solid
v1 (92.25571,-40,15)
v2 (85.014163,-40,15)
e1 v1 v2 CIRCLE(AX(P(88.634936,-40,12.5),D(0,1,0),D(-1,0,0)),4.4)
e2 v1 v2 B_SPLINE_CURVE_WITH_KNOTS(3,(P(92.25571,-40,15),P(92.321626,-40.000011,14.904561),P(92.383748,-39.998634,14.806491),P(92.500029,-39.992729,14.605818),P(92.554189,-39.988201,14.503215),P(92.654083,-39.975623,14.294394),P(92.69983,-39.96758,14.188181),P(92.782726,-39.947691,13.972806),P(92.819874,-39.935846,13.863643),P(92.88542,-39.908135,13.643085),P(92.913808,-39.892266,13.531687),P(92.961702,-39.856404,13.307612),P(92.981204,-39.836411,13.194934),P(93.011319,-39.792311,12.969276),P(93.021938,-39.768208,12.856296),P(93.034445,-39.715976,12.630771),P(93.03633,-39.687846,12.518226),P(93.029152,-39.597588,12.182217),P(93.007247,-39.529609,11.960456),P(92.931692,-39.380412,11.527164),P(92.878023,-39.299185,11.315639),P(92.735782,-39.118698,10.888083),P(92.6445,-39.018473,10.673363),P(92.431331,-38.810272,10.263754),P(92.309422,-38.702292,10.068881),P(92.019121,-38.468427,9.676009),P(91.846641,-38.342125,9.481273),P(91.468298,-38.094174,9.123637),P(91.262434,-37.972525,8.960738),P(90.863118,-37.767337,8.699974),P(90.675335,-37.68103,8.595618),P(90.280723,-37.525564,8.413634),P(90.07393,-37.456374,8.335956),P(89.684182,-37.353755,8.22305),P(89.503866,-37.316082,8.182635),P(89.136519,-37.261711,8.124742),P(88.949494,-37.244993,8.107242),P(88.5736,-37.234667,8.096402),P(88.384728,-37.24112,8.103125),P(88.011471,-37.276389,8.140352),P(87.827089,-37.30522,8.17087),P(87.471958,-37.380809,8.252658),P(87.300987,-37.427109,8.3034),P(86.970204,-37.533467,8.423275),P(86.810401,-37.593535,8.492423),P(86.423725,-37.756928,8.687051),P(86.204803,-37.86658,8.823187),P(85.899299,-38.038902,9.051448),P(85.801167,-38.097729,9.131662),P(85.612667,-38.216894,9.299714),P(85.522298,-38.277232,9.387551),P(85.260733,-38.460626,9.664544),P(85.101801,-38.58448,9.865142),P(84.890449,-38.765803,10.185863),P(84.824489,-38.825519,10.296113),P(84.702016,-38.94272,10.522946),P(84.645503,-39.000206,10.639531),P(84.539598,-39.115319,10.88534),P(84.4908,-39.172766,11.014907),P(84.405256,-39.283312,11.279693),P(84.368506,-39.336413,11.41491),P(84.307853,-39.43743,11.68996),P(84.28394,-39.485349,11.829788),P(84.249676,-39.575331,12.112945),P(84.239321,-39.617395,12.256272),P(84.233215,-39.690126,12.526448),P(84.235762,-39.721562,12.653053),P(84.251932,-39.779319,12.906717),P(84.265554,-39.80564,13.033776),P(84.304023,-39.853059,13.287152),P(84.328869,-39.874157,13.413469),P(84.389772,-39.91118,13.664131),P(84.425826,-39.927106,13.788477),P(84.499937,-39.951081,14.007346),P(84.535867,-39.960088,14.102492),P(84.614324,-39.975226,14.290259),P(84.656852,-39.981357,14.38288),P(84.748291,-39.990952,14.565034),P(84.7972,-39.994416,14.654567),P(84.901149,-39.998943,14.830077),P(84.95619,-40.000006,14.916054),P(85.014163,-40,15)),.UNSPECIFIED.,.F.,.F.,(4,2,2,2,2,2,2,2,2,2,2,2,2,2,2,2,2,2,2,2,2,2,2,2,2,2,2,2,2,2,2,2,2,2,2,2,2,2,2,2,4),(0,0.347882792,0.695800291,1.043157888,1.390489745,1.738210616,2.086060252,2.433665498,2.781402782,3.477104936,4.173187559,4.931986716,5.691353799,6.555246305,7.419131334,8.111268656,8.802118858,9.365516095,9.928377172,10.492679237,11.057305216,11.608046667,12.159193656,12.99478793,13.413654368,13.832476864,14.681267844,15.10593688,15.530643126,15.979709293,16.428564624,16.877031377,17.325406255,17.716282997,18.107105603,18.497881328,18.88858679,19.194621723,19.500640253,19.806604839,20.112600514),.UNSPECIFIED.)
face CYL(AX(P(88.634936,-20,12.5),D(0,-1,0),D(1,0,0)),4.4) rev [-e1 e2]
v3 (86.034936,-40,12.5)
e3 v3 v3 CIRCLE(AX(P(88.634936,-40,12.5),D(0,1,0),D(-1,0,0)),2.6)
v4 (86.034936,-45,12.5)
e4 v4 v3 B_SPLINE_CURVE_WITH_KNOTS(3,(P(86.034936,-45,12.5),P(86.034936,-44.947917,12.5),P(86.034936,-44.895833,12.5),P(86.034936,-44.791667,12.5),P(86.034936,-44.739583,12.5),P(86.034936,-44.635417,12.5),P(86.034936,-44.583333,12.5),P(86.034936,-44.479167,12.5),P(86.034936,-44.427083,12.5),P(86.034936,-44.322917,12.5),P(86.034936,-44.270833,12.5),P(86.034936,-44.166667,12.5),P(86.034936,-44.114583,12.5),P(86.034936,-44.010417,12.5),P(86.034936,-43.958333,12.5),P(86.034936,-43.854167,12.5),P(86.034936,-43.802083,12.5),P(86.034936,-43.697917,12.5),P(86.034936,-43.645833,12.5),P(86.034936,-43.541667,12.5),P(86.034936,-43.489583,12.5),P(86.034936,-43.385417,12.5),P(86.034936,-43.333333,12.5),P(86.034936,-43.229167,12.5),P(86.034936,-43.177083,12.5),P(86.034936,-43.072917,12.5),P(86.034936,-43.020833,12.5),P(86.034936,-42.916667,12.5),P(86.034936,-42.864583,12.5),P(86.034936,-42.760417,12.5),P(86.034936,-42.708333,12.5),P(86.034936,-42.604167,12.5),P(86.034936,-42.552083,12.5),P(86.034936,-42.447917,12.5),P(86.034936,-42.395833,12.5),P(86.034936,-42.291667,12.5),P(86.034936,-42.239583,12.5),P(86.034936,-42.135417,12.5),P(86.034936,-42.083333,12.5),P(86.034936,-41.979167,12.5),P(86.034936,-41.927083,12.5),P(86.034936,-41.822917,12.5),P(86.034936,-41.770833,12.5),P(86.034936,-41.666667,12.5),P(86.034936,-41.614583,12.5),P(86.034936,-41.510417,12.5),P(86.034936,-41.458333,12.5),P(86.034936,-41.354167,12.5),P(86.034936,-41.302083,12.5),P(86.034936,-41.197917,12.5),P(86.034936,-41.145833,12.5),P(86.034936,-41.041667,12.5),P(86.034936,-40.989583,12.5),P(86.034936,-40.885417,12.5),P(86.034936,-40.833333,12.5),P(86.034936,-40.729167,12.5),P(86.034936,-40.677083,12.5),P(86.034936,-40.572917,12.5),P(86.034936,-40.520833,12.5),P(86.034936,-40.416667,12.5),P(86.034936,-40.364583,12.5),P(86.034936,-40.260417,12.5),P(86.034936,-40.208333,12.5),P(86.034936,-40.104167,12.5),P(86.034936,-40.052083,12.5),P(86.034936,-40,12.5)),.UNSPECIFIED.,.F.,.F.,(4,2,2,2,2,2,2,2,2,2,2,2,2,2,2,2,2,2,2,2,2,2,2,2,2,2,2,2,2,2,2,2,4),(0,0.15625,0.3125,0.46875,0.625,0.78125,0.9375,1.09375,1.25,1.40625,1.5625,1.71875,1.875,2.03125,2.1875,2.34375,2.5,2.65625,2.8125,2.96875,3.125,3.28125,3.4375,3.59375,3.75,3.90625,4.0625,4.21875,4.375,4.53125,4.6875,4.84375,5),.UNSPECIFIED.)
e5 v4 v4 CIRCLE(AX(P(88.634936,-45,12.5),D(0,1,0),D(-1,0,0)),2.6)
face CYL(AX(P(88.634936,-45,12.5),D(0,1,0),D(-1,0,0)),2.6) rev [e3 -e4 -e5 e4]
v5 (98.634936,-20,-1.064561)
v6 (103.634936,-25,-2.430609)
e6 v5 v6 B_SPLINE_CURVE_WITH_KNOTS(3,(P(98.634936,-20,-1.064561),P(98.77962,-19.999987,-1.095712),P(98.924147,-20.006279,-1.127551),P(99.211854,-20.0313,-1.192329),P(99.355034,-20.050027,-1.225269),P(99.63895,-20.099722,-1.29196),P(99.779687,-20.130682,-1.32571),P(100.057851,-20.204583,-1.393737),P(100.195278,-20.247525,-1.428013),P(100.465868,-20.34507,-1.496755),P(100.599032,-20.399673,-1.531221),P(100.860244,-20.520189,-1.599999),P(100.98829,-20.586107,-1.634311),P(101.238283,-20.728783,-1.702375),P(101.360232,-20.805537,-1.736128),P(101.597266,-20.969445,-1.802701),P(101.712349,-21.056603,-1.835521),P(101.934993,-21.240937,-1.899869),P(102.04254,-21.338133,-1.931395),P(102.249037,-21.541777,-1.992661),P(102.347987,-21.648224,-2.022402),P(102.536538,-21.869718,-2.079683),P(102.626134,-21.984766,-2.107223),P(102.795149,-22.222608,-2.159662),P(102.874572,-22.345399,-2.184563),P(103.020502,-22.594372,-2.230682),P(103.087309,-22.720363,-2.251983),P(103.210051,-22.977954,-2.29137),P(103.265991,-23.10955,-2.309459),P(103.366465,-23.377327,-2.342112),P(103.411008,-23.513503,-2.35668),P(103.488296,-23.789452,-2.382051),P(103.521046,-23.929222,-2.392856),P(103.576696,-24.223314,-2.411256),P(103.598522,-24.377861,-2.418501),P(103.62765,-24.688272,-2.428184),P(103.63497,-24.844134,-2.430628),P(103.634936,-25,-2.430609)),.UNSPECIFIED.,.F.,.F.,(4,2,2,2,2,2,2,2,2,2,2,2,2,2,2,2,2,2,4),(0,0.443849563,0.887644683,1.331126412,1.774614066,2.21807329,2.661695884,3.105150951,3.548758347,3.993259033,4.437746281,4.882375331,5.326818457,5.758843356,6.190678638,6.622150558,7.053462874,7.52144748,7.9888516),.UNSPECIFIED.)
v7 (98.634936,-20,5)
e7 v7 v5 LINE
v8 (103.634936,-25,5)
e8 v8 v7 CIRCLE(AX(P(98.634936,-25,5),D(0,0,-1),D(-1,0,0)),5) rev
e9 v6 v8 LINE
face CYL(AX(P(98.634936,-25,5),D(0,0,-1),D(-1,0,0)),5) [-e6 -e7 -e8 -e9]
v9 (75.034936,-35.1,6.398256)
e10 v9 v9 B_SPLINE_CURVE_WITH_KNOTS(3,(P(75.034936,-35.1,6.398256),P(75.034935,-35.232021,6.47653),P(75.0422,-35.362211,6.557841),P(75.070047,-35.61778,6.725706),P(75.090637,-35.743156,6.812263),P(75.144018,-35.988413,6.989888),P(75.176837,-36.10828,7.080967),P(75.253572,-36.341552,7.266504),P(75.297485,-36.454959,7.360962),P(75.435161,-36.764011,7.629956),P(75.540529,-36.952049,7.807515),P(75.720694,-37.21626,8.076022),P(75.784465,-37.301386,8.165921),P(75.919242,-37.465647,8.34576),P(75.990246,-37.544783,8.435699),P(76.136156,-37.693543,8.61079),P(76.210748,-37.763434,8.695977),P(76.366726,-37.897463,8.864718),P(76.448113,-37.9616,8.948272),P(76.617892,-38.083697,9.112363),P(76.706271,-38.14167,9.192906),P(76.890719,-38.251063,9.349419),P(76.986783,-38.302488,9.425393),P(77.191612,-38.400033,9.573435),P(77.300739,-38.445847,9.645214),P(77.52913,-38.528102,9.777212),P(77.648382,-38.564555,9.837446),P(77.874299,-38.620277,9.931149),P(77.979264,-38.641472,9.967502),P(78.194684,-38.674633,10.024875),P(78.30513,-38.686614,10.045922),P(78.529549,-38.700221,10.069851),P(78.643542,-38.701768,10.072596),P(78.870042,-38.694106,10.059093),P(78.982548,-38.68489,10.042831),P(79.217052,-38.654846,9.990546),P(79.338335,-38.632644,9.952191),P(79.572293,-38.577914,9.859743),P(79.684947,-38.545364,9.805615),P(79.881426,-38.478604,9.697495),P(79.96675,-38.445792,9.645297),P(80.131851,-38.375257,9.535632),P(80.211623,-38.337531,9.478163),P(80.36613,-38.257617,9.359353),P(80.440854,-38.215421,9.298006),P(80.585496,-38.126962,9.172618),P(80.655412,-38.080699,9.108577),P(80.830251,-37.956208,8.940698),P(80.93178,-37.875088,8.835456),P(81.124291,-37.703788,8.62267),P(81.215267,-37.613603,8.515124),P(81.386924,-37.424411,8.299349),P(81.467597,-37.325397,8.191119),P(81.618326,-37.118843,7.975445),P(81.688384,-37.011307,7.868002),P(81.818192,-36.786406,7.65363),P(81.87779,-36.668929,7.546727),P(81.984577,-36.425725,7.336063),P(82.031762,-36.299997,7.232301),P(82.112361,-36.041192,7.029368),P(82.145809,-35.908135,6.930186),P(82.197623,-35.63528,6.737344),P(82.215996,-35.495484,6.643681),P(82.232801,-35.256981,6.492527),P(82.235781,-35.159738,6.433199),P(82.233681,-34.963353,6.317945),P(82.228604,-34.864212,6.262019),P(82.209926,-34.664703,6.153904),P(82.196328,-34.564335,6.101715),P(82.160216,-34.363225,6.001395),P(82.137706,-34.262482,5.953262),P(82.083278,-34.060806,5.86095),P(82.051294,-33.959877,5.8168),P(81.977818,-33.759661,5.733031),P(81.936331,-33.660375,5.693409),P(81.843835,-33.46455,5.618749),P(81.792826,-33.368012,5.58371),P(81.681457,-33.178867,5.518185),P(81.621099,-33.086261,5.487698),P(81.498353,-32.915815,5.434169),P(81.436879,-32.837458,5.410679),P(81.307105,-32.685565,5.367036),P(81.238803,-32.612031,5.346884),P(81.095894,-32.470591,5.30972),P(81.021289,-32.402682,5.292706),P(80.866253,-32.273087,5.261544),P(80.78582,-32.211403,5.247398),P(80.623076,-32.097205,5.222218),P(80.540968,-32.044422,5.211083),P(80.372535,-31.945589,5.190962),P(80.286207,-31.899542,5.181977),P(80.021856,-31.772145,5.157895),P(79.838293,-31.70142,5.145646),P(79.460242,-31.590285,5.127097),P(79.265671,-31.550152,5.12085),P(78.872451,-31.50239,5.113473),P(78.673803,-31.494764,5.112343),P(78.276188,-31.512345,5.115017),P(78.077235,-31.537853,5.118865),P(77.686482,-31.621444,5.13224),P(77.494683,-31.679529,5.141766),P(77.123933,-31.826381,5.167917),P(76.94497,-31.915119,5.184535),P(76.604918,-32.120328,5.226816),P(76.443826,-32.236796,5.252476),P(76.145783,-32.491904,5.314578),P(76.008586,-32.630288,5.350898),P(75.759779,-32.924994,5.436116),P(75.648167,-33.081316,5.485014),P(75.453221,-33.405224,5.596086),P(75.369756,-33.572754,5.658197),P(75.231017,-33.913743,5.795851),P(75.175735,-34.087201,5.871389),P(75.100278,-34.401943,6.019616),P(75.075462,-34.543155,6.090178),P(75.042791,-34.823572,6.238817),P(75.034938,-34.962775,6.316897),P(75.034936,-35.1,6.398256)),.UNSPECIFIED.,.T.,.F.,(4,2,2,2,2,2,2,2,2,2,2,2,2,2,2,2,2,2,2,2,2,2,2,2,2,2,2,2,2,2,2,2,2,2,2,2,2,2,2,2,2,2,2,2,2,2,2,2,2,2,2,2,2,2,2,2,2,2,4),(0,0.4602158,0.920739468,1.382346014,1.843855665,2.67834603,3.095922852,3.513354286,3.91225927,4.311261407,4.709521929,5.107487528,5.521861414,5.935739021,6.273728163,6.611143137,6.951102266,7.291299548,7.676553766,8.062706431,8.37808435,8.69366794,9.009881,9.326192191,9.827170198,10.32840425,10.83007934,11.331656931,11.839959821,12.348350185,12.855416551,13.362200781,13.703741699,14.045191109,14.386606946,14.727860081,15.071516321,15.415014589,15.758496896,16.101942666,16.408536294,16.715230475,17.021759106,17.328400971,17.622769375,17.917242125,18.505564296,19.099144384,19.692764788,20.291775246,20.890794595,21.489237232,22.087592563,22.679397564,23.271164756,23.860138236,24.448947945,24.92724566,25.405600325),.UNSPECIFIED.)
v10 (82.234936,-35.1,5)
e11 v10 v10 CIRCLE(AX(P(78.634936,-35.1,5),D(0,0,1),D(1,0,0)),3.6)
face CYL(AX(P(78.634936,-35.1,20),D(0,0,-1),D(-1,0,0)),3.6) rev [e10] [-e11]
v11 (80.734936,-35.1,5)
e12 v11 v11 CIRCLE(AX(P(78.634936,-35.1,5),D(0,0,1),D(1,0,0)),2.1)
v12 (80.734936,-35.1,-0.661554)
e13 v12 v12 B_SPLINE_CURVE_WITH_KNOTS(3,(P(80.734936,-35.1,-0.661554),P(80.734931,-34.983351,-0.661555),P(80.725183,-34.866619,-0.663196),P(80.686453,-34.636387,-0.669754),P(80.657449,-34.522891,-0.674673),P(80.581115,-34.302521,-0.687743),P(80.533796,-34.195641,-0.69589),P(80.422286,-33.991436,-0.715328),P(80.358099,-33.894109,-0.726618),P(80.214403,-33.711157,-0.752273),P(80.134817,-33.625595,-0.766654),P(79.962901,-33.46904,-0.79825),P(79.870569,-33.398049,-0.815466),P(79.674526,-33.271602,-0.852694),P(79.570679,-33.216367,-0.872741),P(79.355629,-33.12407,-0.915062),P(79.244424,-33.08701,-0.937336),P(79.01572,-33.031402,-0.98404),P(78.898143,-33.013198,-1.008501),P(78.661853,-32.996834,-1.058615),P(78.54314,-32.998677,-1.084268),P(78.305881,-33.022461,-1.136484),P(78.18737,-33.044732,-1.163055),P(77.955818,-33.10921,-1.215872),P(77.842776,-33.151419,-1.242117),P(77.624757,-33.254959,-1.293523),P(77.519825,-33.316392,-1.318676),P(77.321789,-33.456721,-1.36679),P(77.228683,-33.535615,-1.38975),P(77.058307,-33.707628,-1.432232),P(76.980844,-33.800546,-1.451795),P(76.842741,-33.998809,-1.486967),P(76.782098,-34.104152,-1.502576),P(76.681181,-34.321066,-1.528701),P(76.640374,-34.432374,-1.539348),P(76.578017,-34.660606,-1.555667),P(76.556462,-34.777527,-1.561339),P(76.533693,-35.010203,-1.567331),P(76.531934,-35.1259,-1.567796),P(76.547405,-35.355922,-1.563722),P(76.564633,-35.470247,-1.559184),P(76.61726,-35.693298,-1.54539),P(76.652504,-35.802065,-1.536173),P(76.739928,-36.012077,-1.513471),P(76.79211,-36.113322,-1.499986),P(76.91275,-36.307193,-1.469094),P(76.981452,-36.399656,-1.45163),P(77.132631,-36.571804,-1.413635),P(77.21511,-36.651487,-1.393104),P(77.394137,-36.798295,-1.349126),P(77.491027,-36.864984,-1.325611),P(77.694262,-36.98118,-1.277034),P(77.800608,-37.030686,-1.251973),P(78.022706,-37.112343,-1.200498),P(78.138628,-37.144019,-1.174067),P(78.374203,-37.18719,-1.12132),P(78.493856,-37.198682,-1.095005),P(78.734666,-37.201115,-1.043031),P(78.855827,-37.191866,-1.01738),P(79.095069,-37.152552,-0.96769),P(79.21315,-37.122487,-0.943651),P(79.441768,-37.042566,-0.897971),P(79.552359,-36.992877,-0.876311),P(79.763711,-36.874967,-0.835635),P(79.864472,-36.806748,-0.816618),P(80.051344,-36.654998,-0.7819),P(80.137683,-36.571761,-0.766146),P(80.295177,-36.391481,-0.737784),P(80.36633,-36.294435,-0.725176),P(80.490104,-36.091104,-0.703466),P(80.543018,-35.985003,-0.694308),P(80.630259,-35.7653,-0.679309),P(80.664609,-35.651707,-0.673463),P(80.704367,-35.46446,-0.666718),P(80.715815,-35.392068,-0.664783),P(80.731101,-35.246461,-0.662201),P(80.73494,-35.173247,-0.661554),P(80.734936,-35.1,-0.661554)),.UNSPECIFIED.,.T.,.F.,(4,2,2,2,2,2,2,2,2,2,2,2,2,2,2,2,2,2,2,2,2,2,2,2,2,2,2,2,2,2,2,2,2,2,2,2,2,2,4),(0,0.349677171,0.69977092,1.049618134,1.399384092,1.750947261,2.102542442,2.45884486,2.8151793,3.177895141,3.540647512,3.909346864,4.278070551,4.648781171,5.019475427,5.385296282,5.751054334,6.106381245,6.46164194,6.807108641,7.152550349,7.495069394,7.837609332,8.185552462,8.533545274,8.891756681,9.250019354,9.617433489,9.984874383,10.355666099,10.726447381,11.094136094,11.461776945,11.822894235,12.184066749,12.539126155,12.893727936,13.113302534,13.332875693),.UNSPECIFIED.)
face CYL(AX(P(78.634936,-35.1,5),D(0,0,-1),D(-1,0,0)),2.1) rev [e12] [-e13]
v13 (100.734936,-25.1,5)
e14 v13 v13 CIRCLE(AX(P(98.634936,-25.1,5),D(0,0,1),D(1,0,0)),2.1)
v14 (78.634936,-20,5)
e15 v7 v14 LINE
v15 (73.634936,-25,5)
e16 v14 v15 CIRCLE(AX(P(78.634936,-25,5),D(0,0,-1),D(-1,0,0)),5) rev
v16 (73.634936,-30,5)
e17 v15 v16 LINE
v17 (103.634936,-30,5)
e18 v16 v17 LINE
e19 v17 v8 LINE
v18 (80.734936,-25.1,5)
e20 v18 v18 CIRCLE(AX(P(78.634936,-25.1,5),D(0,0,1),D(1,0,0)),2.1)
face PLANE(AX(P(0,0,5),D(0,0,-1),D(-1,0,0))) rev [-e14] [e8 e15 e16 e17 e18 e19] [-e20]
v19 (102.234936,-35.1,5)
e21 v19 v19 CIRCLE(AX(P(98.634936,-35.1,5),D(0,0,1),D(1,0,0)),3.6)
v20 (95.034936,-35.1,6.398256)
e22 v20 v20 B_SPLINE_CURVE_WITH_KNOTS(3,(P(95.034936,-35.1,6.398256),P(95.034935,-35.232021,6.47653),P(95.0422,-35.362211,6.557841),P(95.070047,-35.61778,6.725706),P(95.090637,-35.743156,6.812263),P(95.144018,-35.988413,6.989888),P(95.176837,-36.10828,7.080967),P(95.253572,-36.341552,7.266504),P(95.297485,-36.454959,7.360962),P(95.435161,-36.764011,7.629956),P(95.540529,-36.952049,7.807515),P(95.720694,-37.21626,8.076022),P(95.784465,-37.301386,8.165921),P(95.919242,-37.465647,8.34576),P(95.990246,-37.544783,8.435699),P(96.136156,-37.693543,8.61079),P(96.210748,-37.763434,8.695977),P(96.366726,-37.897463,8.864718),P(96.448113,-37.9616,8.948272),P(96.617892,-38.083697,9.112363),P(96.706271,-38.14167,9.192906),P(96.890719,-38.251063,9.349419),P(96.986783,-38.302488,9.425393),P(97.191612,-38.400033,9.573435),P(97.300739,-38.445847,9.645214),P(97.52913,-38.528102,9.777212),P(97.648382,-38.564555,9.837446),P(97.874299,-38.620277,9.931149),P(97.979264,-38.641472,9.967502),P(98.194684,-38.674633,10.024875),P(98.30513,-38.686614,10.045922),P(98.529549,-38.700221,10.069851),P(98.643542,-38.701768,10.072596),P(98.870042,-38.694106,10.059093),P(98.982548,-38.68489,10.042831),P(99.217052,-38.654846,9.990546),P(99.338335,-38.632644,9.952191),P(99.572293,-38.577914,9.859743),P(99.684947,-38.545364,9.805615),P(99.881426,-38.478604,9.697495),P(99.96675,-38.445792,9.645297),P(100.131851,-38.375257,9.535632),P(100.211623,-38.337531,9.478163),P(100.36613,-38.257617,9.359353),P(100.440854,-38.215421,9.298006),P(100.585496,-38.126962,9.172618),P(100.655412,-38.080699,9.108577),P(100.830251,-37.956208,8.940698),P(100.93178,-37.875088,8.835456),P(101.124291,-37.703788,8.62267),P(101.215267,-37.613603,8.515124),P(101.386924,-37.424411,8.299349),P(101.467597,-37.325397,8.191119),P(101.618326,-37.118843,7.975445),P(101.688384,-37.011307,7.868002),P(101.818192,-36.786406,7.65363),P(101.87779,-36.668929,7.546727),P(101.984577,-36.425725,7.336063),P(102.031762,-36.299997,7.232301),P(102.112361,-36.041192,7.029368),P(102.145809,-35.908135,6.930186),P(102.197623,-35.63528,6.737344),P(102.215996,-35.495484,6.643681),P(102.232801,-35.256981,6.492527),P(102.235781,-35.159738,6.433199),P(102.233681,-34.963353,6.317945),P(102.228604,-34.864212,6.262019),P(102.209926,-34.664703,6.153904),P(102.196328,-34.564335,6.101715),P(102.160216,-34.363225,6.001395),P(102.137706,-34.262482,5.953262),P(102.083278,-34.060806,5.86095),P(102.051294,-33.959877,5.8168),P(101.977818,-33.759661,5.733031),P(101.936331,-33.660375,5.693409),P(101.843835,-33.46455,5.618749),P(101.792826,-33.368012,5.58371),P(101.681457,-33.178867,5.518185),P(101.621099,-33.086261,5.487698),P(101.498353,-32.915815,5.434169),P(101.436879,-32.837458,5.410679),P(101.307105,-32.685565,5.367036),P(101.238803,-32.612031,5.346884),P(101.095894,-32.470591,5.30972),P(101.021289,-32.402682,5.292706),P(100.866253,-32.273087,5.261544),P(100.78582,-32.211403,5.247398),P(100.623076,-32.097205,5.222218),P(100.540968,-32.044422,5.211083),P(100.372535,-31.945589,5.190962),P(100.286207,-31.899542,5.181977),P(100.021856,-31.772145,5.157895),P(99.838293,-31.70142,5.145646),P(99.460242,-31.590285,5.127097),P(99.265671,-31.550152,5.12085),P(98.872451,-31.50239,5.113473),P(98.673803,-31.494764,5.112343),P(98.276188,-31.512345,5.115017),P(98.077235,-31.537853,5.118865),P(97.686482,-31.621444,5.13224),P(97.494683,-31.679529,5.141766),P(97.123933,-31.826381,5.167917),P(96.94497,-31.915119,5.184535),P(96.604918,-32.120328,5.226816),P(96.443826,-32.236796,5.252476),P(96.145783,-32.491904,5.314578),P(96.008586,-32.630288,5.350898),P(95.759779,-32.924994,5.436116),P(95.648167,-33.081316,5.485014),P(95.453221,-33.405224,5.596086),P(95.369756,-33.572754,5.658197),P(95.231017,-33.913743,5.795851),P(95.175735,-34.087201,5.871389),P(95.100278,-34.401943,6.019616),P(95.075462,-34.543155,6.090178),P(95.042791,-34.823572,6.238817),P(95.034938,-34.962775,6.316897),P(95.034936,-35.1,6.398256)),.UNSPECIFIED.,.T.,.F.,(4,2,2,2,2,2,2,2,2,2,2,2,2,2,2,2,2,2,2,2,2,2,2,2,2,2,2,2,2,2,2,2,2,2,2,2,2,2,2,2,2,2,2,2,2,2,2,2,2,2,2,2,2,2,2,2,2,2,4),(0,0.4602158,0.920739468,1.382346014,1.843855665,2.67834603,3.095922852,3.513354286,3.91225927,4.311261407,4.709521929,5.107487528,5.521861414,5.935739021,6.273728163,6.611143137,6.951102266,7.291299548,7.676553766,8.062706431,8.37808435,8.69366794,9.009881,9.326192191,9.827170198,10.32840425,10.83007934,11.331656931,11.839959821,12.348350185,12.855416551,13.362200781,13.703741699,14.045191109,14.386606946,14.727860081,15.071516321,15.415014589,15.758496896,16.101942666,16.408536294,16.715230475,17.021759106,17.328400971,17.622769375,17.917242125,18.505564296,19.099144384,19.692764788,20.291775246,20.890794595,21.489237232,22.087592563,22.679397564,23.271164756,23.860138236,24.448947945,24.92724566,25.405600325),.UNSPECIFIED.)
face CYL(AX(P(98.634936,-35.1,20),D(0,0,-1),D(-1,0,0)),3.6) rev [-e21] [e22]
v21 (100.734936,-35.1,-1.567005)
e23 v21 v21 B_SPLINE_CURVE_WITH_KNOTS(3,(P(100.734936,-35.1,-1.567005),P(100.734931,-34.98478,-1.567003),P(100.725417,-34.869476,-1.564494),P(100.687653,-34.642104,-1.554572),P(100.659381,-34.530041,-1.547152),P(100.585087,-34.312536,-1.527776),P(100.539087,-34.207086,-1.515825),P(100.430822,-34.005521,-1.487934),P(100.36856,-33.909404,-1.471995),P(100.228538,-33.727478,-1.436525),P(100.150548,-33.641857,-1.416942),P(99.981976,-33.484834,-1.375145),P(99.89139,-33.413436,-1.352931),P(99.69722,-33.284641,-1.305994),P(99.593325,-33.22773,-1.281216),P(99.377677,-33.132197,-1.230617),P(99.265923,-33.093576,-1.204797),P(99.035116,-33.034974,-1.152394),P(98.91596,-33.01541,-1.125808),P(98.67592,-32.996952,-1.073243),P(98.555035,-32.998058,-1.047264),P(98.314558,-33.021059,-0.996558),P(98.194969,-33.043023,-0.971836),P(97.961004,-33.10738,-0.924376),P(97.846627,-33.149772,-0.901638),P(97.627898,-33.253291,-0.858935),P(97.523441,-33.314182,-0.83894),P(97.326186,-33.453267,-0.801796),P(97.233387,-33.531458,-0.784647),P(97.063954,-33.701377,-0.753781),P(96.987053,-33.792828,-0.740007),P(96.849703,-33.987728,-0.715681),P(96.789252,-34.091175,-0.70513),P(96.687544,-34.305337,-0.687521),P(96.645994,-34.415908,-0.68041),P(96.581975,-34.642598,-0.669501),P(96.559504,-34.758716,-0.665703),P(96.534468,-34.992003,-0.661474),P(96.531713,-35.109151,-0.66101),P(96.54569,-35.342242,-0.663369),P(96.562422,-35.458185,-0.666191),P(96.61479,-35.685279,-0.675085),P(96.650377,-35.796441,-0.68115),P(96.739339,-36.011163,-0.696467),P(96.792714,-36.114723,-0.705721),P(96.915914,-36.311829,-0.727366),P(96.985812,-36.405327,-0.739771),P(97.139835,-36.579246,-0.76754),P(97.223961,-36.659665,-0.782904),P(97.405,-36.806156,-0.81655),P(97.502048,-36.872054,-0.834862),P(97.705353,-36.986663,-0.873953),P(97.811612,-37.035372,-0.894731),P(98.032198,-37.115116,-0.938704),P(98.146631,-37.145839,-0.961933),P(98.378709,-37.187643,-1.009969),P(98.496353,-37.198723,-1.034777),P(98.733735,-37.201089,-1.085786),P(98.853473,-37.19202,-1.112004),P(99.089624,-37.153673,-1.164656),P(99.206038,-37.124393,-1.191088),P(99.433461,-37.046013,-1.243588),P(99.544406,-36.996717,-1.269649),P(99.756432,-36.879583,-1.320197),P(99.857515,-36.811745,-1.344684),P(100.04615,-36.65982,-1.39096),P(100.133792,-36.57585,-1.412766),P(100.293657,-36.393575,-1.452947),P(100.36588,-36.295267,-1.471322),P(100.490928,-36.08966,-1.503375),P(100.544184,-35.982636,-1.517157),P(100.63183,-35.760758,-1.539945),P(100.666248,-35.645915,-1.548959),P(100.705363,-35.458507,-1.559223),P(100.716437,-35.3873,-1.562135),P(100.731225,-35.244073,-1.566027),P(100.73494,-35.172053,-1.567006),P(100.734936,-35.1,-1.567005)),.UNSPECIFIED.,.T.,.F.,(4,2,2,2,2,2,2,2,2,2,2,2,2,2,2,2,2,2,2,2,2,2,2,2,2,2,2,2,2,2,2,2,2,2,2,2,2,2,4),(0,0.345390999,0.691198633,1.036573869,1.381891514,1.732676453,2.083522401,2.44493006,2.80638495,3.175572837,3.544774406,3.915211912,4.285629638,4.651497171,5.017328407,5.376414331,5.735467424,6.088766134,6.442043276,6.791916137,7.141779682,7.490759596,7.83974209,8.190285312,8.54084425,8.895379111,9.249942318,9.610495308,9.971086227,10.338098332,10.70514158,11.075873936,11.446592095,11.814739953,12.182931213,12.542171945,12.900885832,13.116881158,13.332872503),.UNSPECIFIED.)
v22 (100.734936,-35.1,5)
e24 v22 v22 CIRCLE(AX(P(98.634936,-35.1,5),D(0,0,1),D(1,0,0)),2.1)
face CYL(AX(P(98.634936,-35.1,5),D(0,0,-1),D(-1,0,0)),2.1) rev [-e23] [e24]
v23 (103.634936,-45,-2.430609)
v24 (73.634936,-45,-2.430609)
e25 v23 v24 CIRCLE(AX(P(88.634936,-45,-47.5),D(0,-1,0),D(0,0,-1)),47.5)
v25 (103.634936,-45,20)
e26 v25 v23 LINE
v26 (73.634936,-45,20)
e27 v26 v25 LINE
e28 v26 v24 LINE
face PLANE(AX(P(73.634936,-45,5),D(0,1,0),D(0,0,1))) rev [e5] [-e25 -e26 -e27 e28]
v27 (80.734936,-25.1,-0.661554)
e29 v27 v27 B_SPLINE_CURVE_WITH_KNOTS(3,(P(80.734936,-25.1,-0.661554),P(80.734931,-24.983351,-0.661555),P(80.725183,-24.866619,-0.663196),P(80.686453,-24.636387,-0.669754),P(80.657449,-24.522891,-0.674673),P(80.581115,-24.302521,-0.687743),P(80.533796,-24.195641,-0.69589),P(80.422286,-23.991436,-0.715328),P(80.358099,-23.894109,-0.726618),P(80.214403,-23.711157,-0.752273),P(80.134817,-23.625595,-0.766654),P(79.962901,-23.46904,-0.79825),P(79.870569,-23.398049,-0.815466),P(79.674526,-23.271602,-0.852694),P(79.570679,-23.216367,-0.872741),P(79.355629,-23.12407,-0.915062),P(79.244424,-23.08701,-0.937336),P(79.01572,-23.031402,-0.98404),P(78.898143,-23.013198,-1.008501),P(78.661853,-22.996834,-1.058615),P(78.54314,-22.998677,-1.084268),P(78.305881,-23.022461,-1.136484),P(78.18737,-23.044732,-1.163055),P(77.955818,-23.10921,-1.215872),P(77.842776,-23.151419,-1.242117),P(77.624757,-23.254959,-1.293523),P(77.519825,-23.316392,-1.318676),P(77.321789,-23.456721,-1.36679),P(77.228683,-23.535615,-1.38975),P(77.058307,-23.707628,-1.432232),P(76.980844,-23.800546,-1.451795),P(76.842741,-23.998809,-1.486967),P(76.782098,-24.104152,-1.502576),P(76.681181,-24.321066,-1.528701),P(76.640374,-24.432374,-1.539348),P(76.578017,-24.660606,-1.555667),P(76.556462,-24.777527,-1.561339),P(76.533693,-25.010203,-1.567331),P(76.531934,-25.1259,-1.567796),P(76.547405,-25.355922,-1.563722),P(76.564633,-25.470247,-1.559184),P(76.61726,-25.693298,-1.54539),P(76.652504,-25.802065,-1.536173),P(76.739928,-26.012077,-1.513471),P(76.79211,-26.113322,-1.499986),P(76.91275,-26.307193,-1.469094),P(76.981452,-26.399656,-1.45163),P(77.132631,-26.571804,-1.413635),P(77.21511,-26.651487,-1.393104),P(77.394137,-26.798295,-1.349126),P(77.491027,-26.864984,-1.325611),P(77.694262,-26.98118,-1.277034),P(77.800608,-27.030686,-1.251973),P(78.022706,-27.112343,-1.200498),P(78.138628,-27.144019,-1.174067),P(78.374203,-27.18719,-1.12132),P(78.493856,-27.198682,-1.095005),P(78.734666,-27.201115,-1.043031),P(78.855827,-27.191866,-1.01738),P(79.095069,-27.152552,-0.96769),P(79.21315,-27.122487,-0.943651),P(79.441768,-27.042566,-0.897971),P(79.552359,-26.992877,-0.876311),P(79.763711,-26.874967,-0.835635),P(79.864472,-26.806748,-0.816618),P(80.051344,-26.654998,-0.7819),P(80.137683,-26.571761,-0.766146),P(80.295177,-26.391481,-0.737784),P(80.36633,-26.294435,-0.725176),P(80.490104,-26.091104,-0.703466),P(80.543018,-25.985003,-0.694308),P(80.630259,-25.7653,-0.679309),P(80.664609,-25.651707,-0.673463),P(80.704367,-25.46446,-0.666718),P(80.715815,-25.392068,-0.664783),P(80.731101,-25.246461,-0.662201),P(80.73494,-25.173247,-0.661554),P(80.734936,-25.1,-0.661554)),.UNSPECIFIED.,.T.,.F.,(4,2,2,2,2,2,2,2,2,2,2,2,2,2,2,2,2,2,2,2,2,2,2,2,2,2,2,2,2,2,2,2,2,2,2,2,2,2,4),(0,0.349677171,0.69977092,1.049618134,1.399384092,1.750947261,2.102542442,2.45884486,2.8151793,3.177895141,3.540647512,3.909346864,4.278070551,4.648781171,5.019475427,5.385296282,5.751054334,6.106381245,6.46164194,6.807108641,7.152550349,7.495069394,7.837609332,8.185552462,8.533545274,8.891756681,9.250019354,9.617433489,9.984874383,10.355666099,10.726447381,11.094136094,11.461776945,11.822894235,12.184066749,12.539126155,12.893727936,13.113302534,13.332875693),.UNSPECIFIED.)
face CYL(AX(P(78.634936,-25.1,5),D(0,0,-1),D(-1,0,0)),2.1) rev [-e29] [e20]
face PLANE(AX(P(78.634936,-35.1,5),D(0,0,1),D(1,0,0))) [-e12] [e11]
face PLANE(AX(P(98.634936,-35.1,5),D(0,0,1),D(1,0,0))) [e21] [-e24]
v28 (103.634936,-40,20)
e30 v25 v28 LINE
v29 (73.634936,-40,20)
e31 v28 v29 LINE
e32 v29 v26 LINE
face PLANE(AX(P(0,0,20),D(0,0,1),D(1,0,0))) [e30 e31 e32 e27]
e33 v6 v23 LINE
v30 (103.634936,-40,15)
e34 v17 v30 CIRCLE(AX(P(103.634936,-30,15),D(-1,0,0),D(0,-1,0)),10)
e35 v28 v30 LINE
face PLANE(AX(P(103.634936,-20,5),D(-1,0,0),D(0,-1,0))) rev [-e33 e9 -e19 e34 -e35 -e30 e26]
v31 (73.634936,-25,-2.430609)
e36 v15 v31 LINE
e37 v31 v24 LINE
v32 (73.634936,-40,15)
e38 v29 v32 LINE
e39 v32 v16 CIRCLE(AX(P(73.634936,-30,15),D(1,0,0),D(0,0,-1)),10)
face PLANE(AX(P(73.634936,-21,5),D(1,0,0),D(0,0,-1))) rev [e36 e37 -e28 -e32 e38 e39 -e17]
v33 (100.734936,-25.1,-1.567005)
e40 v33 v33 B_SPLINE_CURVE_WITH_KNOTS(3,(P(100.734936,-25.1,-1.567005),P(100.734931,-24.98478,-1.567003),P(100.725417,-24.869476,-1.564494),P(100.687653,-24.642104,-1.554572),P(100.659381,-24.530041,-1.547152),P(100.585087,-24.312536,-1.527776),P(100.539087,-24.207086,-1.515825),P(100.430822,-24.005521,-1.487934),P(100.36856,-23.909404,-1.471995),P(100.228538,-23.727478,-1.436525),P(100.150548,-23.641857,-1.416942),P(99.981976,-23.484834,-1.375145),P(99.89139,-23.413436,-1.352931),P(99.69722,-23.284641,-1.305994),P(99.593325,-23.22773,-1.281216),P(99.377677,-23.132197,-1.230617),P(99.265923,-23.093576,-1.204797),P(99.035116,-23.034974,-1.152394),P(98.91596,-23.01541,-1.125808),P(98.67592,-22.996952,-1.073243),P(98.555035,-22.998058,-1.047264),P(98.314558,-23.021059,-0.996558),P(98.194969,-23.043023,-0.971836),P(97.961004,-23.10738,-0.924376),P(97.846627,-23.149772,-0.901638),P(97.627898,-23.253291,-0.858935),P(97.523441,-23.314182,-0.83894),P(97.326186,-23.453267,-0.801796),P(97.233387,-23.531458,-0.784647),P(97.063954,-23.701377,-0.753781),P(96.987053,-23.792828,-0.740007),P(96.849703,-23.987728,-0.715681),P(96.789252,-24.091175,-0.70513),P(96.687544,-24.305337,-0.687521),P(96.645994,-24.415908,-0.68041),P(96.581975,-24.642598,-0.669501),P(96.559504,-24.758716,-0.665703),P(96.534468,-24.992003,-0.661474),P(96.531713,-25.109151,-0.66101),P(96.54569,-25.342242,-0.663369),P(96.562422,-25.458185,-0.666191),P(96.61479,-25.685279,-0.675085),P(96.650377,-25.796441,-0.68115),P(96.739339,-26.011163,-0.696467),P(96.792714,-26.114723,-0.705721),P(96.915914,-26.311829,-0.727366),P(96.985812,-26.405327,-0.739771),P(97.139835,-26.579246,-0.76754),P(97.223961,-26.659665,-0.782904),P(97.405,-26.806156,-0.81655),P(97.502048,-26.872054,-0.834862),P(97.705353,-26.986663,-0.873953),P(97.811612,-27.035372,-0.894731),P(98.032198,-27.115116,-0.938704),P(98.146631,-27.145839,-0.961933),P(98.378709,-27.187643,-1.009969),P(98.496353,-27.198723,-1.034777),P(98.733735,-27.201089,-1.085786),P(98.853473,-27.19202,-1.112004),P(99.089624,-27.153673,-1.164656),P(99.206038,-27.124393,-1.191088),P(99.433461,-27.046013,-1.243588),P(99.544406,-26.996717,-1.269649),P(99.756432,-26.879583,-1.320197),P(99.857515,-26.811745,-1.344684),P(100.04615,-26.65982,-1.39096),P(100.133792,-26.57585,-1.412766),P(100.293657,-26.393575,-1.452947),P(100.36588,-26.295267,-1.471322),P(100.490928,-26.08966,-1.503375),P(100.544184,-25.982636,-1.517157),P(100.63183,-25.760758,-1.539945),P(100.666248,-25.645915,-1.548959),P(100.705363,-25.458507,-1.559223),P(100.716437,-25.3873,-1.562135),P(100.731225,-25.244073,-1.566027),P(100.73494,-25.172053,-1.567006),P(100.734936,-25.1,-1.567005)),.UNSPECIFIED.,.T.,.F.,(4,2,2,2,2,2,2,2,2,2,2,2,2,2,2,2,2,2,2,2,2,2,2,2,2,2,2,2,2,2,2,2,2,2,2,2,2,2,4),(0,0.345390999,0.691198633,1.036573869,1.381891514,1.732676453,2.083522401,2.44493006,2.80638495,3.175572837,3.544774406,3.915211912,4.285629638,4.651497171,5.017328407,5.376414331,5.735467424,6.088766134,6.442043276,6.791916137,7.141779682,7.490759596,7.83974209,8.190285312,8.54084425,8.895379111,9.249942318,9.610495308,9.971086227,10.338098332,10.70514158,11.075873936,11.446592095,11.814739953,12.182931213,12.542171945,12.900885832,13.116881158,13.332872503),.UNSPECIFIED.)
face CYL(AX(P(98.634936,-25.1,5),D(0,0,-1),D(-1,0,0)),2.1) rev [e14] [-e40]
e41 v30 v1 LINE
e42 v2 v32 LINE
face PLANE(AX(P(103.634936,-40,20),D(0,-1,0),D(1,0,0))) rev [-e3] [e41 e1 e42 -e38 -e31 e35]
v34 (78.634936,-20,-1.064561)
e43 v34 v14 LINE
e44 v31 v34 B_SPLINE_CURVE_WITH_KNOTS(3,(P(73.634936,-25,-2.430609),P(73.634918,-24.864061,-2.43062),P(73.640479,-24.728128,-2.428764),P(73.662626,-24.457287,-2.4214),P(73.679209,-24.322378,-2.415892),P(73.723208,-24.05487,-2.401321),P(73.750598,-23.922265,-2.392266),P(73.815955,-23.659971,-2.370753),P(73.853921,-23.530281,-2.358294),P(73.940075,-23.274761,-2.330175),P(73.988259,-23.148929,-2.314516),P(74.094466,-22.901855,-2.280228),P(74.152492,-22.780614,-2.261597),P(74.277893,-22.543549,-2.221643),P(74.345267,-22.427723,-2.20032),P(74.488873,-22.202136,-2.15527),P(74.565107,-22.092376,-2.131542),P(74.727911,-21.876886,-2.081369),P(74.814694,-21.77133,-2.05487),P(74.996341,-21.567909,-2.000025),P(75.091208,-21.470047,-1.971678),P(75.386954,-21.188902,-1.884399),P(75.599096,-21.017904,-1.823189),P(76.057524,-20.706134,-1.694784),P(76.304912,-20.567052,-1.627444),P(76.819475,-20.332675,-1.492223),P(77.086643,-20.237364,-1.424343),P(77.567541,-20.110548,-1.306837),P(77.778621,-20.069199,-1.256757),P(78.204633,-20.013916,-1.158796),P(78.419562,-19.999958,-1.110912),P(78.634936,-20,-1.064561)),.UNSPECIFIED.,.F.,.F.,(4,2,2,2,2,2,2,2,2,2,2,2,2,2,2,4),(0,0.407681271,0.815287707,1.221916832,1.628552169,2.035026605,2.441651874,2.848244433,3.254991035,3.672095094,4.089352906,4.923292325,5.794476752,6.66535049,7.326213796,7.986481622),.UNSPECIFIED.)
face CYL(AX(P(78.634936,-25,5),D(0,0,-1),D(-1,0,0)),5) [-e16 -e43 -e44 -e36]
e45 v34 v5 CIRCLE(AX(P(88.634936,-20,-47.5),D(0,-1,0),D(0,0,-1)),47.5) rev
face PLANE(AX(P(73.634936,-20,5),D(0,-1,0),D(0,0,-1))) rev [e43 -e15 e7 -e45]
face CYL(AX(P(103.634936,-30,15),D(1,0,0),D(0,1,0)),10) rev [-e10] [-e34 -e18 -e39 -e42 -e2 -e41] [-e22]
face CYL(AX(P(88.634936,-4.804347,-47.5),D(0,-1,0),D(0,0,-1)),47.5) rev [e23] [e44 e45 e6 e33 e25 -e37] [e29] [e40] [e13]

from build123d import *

# Parameters (mm, degrees)
SKETCH1_R           = 2.1
BOSS_EXTRUDE1_DEPTH = 5
SKETCH3_W           = 30
SKETCH3_H           = 5
BOSS_EXTRUDE2_DEPTH = 15
SKETCH4_R           = 2.6
CUT_EXTRUDE2_DEPTH  = 108.425323176
FILLET2_R           = 10
SKETCH5_R           = 4.4
CUT_EXTRUDE3_DEPTH  = 108.425323272
SKETCH2_R           = 3.6
CUT_EXTRUDE4_DEPTH  = 114.974558916
BOSS_EXTRUDE3_DEPTH = 25
FILLET3_R           = 5
SKETCH7_R           = 2.1
CUT_EXTRUDE5_DEPTH  = 114.974558956


with BuildPart() as part:
    # Sketch1 → Boss-Extrude1 (new body)
    with BuildSketch(Plane.XY):
        Polygon((73.634936481, -21), (73.634936481, -20), (103.634936481, -20), (103.634936481, -21), (103.634936481, -45), (73.634936481, -45), align=None)
        with Locations((98.634936481, -35.1)):
            Circle(SKETCH1_R, mode=Mode.SUBTRACT)
        with Locations((78.634936481, -35.1)):
            Circle(SKETCH1_R, mode=Mode.SUBTRACT)
        with Locations((98.634936481, -25.1)):
            Circle(SKETCH1_R, mode=Mode.SUBTRACT)
        with Locations((78.634936481, -25.1)):
            Circle(SKETCH1_R, mode=Mode.SUBTRACT)
    extrude(amount=BOSS_EXTRUDE1_DEPTH)

    # Sketch3 → Boss-Extrude2 (add)
    with BuildSketch(Plane.XY.offset(5)):
        with Locations((88.634936481, -42.5)):
            Rectangle(SKETCH3_W, SKETCH3_H)
    extrude(amount=BOSS_EXTRUDE2_DEPTH)

    # Sketch4 → Cut-Extrude2 (cut, through all)
    with BuildSketch(Plane(origin=(0, -40, 0), x_dir=(1, 0, 0), z_dir=(0, 1, 0))):
        with Locations(Location((88.634936481, -12.5, 0), (0, 0, 180))):
            Circle(SKETCH4_R)
    extrude(amount=-CUT_EXTRUDE2_DEPTH, mode=Mode.SUBTRACT)

    # Fillet2
    # the kernel refuses this fillet: 10 mm, written as the material it adds along each edge
    with BuildSketch(Plane(origin=(73.634936481, -40, 5), x_dir=(0, 0, 1), z_dir=(1, 0, 0))) as fillet2_piece_1_section:
        with BuildLine():
            CenterArc((FILLET2_R, -FILLET2_R), FILLET2_R, 90, 90)
            Line((0, -FILLET2_R), (0, 0))
            Line((0, 0), (FILLET2_R, 0))
        make_face()
    fillet2_piece_1 = extrude(amount=30, mode=Mode.PRIVATE)
    fillet2_piece_1 = fillet2_piece_1 - Plane(origin=(88.634936481, -37.846712749, 12.5), x_dir=(-1, 0, 0), z_dir=(0, 1, 0)) * Cylinder(2.6, 100, mode=Mode.PRIVATE)
    fillet2_piece_1 = fillet2_piece_1 - Plane(origin=(98.634936481, -35.1, 7.280393082), x_dir=(1, 0, 0), z_dir=(0, 0, -1)) * Cylinder(2.1, 100, mode=Mode.PRIVATE)
    fillet2_piece_1 = fillet2_piece_1 - Plane(origin=(78.634936481, -35.1, 7.280393082), x_dir=(1, 0, 0), z_dir=(0, 0, -1)) * Cylinder(2.1, 100, mode=Mode.PRIVATE)
    add(fillet2_piece_1)

    # Sketch5 → Cut-Extrude3 (cut, through all)
    with BuildSketch(Plane(origin=(0, -40, 0), x_dir=(1, 0, 0), z_dir=(0, 1, 0))):
        with Locations((88.634936481, -12.5)):
            Circle(SKETCH5_R)
    extrude(amount=CUT_EXTRUDE3_DEPTH, mode=Mode.SUBTRACT)

    # Sketch2 → Cut-Extrude4 (cut, through all)
    with BuildSketch(Plane.XY.offset(5)):
        with Locations((98.634936481, -25.1)):
            Circle(SKETCH2_R)
        with Locations(Location((98.634936481, -35.1, 0), (0, 0, 180))):
            Circle(SKETCH2_R)
        with Locations((78.634936481, -25.1)):
            Circle(SKETCH2_R)
        with Locations(Location((78.634936481, -35.1, 0), (0, 0, 180))):
            Circle(SKETCH2_R)
    extrude(amount=CUT_EXTRUDE4_DEPTH, mode=Mode.SUBTRACT)

    # Sketch6 → Boss-Extrude3 (add)
    with BuildSketch(Plane.XZ.offset(45)):
        with BuildLine():
            Line((88.634936481, 0), (73.634936481, 0))
            Line((73.634936481, 0), (73.634936481, -2.430609057))
            ThreePointArc((73.634936481, -2.430609057), (81.037110141, -0.611589546), (88.634936481, 0))
        make_face()
        with BuildLine():
            Line((103.634936481, 0), (88.634936481, 0))
            ThreePointArc((88.634936481, 0), (96.232762821, -0.611589546), (103.634936481, -2.430609057))
            Line((103.634936481, -2.430609057), (103.634936481, 0))
        make_face()
    extrude(amount=-BOSS_EXTRUDE3_DEPTH)

    # Fillet3
    fillet3_edges = [part.edges().sort_by_distance(p)[0] for p in [
        (103.634936481, -20, 1.284695471),
        (73.634936481, -20, 1.284695471),
    ]]
    fillet(fillet3_edges, radius=FILLET3_R)

    # Sketch7 → Cut-Extrude5 (cut, through all)
    with BuildSketch(Plane.XY.offset(5)):
        with Locations((98.634936481, -35.1)):
            Circle(SKETCH7_R)
        with Locations((98.634936481, -25.1)):
            Circle(SKETCH7_R)
        with Locations((78.634936481, -25.1)):
            Circle(SKETCH7_R)
        with Locations((78.634936481, -35.1)):
            Circle(SKETCH7_R)
    extrude(amount=-CUT_EXTRUDE5_DEPTH, mode=Mode.SUBTRACT)


solid = part.part
